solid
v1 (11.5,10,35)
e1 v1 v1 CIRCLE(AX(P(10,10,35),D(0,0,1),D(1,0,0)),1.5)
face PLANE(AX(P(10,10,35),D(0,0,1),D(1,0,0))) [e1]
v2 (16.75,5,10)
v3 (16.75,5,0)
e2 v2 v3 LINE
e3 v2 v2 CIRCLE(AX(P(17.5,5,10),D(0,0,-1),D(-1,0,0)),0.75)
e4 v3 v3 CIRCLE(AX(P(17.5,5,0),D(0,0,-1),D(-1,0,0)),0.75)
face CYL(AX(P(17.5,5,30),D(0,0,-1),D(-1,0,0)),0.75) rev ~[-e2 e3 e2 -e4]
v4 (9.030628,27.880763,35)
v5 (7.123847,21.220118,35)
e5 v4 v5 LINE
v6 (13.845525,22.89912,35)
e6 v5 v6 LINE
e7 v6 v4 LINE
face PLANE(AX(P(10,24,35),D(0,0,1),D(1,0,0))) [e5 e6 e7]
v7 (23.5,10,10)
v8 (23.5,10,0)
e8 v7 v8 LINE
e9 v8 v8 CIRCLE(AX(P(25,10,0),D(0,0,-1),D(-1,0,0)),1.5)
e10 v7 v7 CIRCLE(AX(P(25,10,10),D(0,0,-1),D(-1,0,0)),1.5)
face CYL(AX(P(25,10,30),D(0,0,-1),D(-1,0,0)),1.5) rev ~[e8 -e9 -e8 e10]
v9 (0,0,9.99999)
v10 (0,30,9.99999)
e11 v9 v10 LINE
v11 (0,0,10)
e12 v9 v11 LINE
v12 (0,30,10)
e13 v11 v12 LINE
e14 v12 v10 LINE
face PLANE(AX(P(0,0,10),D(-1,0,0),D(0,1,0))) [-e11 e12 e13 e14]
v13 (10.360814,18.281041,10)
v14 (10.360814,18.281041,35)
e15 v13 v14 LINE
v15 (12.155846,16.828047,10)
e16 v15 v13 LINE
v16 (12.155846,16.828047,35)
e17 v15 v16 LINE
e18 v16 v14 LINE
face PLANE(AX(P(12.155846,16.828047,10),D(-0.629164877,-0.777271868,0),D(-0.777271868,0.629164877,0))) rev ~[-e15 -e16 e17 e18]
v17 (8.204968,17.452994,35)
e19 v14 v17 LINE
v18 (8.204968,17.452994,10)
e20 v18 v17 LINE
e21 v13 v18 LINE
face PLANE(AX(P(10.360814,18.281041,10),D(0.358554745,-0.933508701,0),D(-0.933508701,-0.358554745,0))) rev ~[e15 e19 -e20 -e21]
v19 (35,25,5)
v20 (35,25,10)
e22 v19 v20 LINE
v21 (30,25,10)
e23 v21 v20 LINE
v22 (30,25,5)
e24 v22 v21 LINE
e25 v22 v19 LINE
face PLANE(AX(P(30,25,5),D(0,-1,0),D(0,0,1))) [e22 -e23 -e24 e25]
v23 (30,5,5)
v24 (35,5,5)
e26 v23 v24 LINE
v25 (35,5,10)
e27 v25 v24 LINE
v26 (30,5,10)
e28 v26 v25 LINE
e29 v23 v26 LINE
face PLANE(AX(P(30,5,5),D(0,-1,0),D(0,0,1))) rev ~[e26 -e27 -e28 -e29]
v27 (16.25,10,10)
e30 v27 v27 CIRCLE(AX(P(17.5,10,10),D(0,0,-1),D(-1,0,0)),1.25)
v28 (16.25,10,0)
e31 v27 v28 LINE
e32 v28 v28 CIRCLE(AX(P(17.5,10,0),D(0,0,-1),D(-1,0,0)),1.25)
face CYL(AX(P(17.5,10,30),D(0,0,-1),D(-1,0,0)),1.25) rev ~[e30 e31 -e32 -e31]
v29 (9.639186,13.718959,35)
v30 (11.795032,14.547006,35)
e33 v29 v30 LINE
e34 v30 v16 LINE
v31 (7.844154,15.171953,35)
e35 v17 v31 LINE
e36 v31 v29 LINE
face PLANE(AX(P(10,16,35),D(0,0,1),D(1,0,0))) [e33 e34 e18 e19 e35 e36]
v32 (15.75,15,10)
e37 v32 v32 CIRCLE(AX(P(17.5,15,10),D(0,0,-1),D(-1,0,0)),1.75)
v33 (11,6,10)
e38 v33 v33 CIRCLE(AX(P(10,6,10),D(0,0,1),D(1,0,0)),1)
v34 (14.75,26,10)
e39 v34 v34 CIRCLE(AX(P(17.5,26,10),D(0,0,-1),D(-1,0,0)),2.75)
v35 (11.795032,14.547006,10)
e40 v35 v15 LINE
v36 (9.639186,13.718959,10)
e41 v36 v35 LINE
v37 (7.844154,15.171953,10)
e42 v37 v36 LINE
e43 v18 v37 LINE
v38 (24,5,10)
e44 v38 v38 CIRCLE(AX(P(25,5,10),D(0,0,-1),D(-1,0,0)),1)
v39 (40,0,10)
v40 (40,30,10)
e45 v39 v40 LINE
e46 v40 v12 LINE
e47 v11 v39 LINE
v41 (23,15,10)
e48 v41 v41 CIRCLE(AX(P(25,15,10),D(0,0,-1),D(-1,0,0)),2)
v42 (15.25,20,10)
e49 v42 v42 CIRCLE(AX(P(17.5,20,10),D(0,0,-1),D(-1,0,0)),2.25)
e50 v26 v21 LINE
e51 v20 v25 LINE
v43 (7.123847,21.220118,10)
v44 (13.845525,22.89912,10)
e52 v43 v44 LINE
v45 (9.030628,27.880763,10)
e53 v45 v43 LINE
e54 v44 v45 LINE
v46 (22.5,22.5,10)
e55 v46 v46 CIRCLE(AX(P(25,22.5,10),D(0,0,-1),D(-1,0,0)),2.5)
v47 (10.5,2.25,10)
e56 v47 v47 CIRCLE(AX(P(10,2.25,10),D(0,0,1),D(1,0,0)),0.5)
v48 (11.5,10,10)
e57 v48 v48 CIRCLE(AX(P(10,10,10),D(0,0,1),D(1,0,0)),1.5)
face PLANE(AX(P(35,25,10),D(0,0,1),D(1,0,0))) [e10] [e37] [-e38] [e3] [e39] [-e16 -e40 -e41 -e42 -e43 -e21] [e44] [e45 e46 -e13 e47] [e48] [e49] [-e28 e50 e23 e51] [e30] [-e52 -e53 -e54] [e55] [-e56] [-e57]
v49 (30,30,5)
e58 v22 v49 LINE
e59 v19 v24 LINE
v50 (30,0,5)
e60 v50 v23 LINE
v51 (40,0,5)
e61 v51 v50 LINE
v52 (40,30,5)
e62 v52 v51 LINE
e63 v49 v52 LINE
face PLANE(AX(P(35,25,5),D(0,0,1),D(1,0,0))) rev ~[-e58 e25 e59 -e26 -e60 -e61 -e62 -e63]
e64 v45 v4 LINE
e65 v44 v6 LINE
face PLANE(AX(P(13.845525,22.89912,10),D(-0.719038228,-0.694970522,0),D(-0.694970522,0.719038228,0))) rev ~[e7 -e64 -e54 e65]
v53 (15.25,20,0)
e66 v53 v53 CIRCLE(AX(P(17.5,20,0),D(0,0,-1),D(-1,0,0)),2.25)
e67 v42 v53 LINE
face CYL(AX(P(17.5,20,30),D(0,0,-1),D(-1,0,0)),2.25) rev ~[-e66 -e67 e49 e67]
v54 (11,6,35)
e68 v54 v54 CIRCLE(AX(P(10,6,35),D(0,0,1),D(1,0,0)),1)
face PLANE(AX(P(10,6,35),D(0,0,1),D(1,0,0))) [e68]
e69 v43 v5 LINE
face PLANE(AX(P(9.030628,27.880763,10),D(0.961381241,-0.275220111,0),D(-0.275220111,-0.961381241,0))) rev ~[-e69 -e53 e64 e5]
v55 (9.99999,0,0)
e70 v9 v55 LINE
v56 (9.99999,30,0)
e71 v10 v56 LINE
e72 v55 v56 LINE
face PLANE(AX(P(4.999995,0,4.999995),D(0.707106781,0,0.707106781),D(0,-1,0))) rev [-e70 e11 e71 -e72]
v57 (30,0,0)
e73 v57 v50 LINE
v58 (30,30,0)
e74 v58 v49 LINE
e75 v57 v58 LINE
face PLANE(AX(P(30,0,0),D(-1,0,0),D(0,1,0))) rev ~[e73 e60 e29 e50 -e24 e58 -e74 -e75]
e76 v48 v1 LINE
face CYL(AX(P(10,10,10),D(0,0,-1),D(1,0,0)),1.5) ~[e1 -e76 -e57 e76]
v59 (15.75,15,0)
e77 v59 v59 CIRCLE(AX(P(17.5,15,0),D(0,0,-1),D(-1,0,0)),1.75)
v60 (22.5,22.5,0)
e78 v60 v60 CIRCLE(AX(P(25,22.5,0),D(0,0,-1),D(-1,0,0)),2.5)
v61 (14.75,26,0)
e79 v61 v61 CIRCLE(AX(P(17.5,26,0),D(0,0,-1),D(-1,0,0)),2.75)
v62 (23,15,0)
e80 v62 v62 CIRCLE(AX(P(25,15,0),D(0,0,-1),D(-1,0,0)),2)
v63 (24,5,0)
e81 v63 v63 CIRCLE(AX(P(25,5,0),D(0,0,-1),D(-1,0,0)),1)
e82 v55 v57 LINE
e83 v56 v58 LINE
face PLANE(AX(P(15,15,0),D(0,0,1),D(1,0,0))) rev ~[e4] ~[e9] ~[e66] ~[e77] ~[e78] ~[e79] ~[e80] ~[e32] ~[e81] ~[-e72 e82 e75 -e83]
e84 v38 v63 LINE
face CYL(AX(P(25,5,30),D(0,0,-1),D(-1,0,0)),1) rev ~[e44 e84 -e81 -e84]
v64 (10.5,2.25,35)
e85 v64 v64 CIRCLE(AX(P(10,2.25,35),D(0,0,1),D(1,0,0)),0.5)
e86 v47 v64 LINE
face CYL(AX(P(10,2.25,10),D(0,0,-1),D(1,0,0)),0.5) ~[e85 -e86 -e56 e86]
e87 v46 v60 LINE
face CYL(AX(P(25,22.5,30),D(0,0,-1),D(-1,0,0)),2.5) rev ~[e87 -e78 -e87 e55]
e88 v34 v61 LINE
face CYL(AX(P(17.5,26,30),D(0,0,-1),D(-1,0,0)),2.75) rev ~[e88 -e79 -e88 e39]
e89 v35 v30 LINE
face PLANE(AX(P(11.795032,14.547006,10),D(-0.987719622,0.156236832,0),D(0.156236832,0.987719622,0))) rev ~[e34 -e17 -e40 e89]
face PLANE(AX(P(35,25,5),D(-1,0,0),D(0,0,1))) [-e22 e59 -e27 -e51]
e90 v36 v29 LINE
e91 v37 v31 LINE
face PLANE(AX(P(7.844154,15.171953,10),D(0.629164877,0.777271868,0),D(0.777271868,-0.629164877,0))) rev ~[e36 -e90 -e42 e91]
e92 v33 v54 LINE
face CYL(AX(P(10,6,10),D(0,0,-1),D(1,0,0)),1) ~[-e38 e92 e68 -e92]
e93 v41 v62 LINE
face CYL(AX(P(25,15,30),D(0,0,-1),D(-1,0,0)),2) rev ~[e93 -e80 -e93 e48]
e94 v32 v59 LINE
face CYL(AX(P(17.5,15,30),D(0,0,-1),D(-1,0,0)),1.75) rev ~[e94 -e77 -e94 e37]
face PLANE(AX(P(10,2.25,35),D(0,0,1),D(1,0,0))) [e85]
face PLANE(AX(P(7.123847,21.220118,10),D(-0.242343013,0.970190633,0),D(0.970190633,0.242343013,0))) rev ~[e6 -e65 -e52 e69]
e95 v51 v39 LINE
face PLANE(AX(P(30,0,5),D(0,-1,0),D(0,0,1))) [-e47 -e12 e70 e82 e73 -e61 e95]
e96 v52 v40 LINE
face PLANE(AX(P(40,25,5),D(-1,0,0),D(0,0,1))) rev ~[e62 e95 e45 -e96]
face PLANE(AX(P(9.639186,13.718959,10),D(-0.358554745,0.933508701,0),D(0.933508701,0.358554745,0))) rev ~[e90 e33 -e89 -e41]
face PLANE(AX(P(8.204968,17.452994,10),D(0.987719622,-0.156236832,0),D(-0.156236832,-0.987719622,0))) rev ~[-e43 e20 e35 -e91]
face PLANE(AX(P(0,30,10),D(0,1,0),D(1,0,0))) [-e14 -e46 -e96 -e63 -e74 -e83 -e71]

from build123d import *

# Parameters (mm, degrees)
F0_W      = 30
F0_H      = 30
F1_DEPTH  = 10
F2_W      = 10
F2_H      = 30
F3_DEPTH  = 20
F5_D      = 2
F5_DEPTH  = 20
F5_TIP    = 0.600860619
F7_D      = 3
F7_DEPTH  = 20
F7_TIP    = 0.9012909285
F9_D      = 4
F9_DEPTH  = 20
F9_TIP    = 1.2017212381
F11_D     = 5
F11_DEPTH = 20
F11_TIP   = 1.5021515476
F13_D     = 1.5
F13_DEPTH = 20
F13_TIP   = 0.4506454643
F15_D     = 2.5
F15_DEPTH = 20
F15_TIP   = 0.7510757738
F17_D     = 3.5
F17_DEPTH = 20
F17_TIP   = 1.0515060833
F19_D     = 4.5
F19_DEPTH = 20
F19_TIP   = 1.3519363928
F21_D     = 5.5
F21_DEPTH = 20
F21_TIP   = 1.6523667023
F22_DEPTH = 20
F23_SIZE  = 9.99999
F24_R     = 1
F25_DEPTH = 25
F26_R     = 1.5
F27_DEPTH = 25
F28_R     = 0.5
F29_DEPTH = 25
F31_DEPTH = 25
F33_DEPTH = 25
F34_W     = 5
F34_H     = 5
F35_DEPTH = 10
F36_W     = 5
F36_H     = 5
F37_DEPTH = 25


# Not quite as in the source:
# - a fillet or chamfer is up to 0.001 mm smaller than in the source, because OpenCascade refuses the exact size


with BuildPart() as f1:
    # F0 (on Top) → F1 (new body)
    with BuildSketch(Plane.XY):
        with Locations((15, 15)):
            Rectangle(F0_W, F0_H)
    extrude(amount=F1_DEPTH)

    # F2 (on face) → F3 (join)
    with BuildSketch(Plane.XY.offset(10)):
        with Locations((5, 15)):
            Rectangle(F2_W, F2_H)
    extrude(amount=F3_DEPTH)

    # F5
    with Locations(Plane.XY.offset(10)):
        with Locations((25, 5)):
            Hole(F5_D / 2, depth=F5_DEPTH)
            with Locations((0, 0, -(F5_DEPTH + F5_TIP / 2))):  # 118° drill point
                Cone(0, F5_D / 2, F5_TIP, mode=Mode.SUBTRACT)

    # F7
    with Locations(Plane.XY.offset(10)):
        with Locations((25, 10)):
            Hole(F7_D / 2, depth=F7_DEPTH)
            with Locations((0, 0, -(F7_DEPTH + F7_TIP / 2))):  # 118° drill point
                Cone(0, F7_D / 2, F7_TIP, mode=Mode.SUBTRACT)

    # F9
    with Locations(Plane.XY.offset(10)):
        with Locations((25, 15)):
            Hole(F9_D / 2, depth=F9_DEPTH)
            with Locations((0, 0, -(F9_DEPTH + F9_TIP / 2))):  # 118° drill point
                Cone(0, F9_D / 2, F9_TIP, mode=Mode.SUBTRACT)

    # F11
    with Locations(Plane.XY.offset(10)):
        with Locations((25, 22.5)):
            Hole(F11_D / 2, depth=F11_DEPTH)
            with Locations((0, 0, -(F11_DEPTH + F11_TIP / 2))):  # 118° drill point
                Cone(0, F11_D / 2, F11_TIP, mode=Mode.SUBTRACT)

    # F13
    with Locations(Plane.XY.offset(10)):
        with Locations((17.5, 5)):
            Hole(F13_D / 2, depth=F13_DEPTH)
            with Locations((0, 0, -(F13_DEPTH + F13_TIP / 2))):  # 118° drill point
                Cone(0, F13_D / 2, F13_TIP, mode=Mode.SUBTRACT)

    # F15
    with Locations(Plane.XY.offset(10)):
        with Locations((17.5, 10)):
            Hole(F15_D / 2, depth=F15_DEPTH)
            with Locations((0, 0, -(F15_DEPTH + F15_TIP / 2))):  # 118° drill point
                Cone(0, F15_D / 2, F15_TIP, mode=Mode.SUBTRACT)

    # F17
    with Locations(Plane.XY.offset(10)):
        with Locations((17.5, 15)):
            Hole(F17_D / 2, depth=F17_DEPTH)
            with Locations((0, 0, -(F17_DEPTH + F17_TIP / 2))):  # 118° drill point
                Cone(0, F17_D / 2, F17_TIP, mode=Mode.SUBTRACT)

    # F19
    with Locations(Plane.XY.offset(10)):
        with Locations((17.5, 20)):
            Hole(F19_D / 2, depth=F19_DEPTH)
            with Locations((0, 0, -(F19_DEPTH + F19_TIP / 2))):  # 118° drill point
                Cone(0, F19_D / 2, F19_TIP, mode=Mode.SUBTRACT)

    # F21
    with Locations(Plane.XY.offset(10)):
        with Locations((17.5, 26)):
            Hole(F21_D / 2, depth=F21_DEPTH)
            with Locations((0, 0, -(F21_DEPTH + F21_TIP / 2))):  # 118° drill point
                Cone(0, F21_D / 2, F21_TIP, mode=Mode.SUBTRACT)

    # F22 (cut): a face of the model
    f22_faces = [f1.faces().sort_by_distance(p)[0] for p in [
        (5, 15, 30),
    ]]
    extrude(f22_faces, amount=-F22_DEPTH, mode=Mode.SUBTRACT)

    # F23 (size 10 in the source; OpenCascade refuses exactly that, so slightly less here)
    f23_edges = [f1.edges().sort_by_distance(p)[0] for p in [
        (0, 15, 0),
    ]]
    chamfer(f23_edges, length=F23_SIZE)

    # F24 (on face) → F25 (join)
    with BuildSketch(Plane.XY.offset(10)):
        with Locations((10, 6)):
            Circle(F24_R)
    extrude(amount=F25_DEPTH)

    # F26 (on face) → F27 (join)
    with BuildSketch(Plane.XY.offset(10)):
        with Locations((10, 10)):
            Circle(F26_R)
    extrude(amount=F27_DEPTH)

    # F28 (on face) → F29 (join)
    with BuildSketch(Plane.XY.offset(10)):
        with Locations((10, 2.25)):
            Circle(F28_R)
    extrude(amount=F29_DEPTH)

    # F30 (on face) → F31 (join)
    with BuildSketch(Plane.XY.offset(10)):
        Polygon((12.1558459991, 16.8280467147), (10.3608135091, 18.2810407592), (8.20496751, 17.4529940445), (7.8441540009, 15.1719532853), (9.6391864909, 13.7189592408), (11.79503249, 14.5470059555), align=None)
    extrude(amount=F31_DEPTH)

    # F32 (on face) → F33 (join)
    with BuildSketch(Plane.XY.offset(10)):
        Polygon((13.8455249644, 22.8991195577), (9.0306279474, 27.8807625312), (7.1238470882, 21.2201179111), align=None)
    extrude(amount=F33_DEPTH)

    # F34 (on face) → F35 (join)
    with BuildSketch(Plane.YZ.offset(30)):
        with Locations((2.5, 7.5)):
            Rectangle(F34_W, F34_H)
        with Locations((27.5, 7.5)):
            Rectangle(F34_W, F34_H)
    extrude(amount=F35_DEPTH)

    # F36 (on face) → F37 (join)
    with BuildSketch(Plane.XZ.offset(-25)):
        with Locations((37.5, 7.5)):
            Rectangle(F36_W, F36_H)
    extrude(amount=F37_DEPTH)


solid = f1.part
